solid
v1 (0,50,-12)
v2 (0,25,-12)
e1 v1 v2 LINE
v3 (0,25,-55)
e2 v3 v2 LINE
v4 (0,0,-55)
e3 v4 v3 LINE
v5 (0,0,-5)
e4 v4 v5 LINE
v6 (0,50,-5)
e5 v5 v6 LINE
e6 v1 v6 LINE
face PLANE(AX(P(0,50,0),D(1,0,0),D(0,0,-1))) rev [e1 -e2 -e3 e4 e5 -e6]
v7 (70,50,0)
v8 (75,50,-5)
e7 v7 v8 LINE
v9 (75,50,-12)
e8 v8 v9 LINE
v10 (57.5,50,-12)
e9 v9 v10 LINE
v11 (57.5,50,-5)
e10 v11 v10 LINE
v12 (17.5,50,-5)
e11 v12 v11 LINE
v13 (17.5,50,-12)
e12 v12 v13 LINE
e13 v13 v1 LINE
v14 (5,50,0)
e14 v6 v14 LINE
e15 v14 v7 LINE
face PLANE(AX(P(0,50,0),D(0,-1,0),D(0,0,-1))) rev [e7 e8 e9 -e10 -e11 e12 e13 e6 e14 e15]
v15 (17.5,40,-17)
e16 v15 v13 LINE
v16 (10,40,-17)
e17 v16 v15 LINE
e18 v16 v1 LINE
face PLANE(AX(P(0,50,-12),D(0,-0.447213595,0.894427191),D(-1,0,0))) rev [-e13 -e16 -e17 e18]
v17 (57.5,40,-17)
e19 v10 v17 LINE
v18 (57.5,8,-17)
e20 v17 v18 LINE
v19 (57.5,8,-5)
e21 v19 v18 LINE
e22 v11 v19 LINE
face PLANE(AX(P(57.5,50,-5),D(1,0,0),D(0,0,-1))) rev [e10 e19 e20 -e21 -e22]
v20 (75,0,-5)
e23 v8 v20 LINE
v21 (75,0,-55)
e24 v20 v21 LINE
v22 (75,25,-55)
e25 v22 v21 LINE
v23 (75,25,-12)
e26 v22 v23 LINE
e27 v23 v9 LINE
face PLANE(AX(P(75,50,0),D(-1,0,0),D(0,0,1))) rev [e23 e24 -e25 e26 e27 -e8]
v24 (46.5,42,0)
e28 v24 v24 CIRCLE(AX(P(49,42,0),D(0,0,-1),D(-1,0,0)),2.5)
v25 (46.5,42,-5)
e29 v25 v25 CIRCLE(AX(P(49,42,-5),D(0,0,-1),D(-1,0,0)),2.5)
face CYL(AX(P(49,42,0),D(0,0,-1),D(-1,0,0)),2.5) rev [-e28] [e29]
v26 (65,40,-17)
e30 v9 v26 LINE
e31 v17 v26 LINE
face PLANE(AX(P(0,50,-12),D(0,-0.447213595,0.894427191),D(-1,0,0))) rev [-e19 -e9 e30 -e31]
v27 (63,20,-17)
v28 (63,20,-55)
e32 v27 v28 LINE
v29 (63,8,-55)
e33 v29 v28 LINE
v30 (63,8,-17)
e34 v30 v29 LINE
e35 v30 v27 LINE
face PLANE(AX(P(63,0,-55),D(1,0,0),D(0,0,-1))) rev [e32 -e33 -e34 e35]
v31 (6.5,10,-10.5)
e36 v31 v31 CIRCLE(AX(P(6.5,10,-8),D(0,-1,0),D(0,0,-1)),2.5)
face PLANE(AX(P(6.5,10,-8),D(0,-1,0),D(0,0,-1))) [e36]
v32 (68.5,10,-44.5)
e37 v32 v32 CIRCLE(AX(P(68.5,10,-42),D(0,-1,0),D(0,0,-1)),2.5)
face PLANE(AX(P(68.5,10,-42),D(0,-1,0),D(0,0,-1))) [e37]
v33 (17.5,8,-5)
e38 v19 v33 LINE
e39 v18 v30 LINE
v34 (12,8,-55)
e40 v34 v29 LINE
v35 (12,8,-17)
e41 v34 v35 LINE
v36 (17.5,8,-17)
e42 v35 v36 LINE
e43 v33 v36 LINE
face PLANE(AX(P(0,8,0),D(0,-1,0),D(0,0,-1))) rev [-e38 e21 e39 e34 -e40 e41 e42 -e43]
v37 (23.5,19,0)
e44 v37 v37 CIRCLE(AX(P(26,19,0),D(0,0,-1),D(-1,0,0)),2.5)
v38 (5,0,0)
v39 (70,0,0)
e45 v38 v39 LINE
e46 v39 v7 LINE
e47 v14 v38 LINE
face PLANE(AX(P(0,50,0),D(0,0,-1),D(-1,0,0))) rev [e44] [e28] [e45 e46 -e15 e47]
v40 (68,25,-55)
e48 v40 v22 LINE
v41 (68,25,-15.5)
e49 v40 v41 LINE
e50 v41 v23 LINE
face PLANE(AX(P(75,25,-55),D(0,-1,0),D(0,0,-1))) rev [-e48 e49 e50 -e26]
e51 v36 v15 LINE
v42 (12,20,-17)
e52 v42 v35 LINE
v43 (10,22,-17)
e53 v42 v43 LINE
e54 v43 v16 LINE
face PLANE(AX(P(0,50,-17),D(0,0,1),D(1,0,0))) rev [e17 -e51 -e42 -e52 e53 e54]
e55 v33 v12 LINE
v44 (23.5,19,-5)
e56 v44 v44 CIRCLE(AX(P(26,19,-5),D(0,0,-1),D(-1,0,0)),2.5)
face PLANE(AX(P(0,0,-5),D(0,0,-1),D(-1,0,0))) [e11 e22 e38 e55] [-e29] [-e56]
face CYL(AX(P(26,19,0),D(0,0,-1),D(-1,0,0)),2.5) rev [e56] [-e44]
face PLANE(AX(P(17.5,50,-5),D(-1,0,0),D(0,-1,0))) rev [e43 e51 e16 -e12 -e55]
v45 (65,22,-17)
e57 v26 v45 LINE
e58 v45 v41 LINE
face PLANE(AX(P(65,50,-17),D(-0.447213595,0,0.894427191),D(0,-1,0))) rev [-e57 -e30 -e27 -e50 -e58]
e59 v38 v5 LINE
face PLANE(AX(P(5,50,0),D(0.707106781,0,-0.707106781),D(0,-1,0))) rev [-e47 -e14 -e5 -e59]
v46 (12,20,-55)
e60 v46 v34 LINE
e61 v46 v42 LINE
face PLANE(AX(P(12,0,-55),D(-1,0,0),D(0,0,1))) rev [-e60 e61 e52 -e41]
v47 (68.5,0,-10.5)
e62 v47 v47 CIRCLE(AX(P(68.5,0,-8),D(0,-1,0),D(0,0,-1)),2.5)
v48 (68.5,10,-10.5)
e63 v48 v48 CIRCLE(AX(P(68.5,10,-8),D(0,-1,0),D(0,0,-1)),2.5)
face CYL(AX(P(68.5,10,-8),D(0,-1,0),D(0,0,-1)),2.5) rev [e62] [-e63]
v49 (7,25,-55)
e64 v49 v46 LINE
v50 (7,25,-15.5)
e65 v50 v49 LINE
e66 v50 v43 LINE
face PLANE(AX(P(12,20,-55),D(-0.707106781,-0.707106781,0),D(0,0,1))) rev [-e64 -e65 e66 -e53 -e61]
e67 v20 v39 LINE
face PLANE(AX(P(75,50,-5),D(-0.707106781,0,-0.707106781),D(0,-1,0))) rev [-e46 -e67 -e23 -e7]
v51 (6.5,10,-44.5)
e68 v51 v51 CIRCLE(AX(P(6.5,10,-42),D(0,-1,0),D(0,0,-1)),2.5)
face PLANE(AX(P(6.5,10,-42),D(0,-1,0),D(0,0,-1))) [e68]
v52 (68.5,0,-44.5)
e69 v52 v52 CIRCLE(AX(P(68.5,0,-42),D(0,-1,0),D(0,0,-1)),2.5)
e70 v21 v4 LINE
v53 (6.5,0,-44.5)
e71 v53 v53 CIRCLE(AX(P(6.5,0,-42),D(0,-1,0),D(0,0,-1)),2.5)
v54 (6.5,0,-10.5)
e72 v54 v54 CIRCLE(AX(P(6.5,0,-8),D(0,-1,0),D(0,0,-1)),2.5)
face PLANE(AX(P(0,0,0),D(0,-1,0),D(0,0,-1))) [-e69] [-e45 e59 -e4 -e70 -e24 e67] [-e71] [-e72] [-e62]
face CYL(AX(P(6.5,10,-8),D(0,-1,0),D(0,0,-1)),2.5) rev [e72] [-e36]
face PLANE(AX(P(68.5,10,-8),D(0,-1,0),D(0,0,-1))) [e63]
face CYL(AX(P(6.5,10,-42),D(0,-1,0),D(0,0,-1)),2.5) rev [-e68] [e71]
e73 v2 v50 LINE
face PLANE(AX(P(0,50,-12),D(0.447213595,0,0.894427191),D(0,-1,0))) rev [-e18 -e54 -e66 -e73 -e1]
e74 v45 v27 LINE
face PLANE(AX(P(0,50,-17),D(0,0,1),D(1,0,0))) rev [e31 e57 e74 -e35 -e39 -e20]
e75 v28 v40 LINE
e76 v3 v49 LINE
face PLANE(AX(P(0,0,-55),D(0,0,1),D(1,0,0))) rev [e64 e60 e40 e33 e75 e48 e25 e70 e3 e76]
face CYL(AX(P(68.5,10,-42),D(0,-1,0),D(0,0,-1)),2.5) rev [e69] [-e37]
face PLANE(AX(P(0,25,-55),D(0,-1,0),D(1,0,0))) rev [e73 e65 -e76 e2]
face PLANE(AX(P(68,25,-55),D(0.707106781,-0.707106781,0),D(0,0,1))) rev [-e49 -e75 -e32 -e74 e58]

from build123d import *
from OCP.BRepFilletAPI import BRepFilletAPI_MakeChamfer

# Parameters (mm, degrees)
SKETCH1_W           = 75
SKETCH1_H           = 17
BOSS_EXTRUDE1_DEPTH = 50
SKETCH2_W           = 12
SKETCH2_H           = 25
BOSS_EXTRUDE2_DEPTH = 38
SKETCH3_W           = 75
SKETCH3_H           = 55
BOSS_EXTRUDE3_DEPTH = 8
SKETCH4_R           = 2.5
CUT_EXTRUDE1_DEPTH  = 10
SKETCH5_W           = 40
SKETCH5_H           = 42
CUT_EXTRUDE2_DEPTH  = 12
CUT_EXTRUDE3_DEPTH  = 104.07764064
CHAMFER1_SIZE       = 5
CHAMFER3_SIZE       = 5
CHAMFER3_SIZE_2     = 10
CHAMFER4_SIZE       = 5
CHAMFER4_SIZE2      = 10


with BuildPart() as part:
    # Sketch1 → Boss-Extrude1 (new body)
    with BuildSketch(Plane(origin=(0, 0, 0), x_dir=(1, 0, 0), z_dir=(0, 1, 0))):
        with Locations((37.5, 8.5)):
            Rectangle(SKETCH1_W, SKETCH1_H)
    extrude(amount=BOSS_EXTRUDE1_DEPTH)

    # Sketch2 → Boss-Extrude2 (add)
    with BuildSketch(Plane(origin=(0, 0, -17), x_dir=(-1, 0, 0), z_dir=(0, 0, -1))):
        with Locations((-69, 12.5)):
            Rectangle(SKETCH2_W, SKETCH2_H)
        with Locations((-6, 12.5)):
            Rectangle(SKETCH2_W, SKETCH2_H)
    extrude(amount=BOSS_EXTRUDE2_DEPTH)

    # Sketch3 → Boss-Extrude3 (add)
    with BuildSketch(Plane.XZ):
        with Locations((37.5, -27.5)):
            Rectangle(SKETCH3_W, SKETCH3_H)
    extrude(amount=-BOSS_EXTRUDE3_DEPTH)

    # Sketch4 → Cut-Extrude1 (cut)
    with BuildSketch(Plane(origin=(0, 0, 0), x_dir=(-1, 0, 0), z_dir=(0, -1, 0))):
        with Locations(Location((-6.5, 8, 0), (0, 0, 90))):
            Circle(SKETCH4_R)
        with Locations(Location((-68.5, 8, 0), (0, 0, 90))):
            Circle(SKETCH4_R)
        with Locations(Location((-6.5, 42, 0), (0, 0, 90))):
            Circle(SKETCH4_R)
        with Locations(Location((-68.5, 42, 0), (0, 0, 90))):
            Circle(SKETCH4_R)
    extrude(amount=-CUT_EXTRUDE1_DEPTH, mode=Mode.SUBTRACT)

    # Sketch5 → Cut-Extrude2 (cut)
    with BuildSketch(Plane(origin=(0, 0, -17), x_dir=(-1, 0, 0), z_dir=(0, 0, -1))):
        with Locations((-37.5, 29)):
            Rectangle(SKETCH5_W, SKETCH5_H)
    extrude(amount=-CUT_EXTRUDE2_DEPTH, mode=Mode.SUBTRACT)

    # Sketch6 → Cut-Extrude3 (cut, through all)
    with BuildSketch(Plane(origin=(0, 0, -5), x_dir=(-1, 0, 0), z_dir=(0, 0, -1))):
        with BuildLine():
            Line((-49, 39.5), (-49, 42))
            Line((-49, 42), (-46.5, 42))
            ThreePointArc((-46.5, 42), (-50.767766953, 43.767766953), (-49, 39.5))
        make_face()
        with BuildLine():
            Line((-46.5, 42), (-49, 42))
            Line((-49, 42), (-49, 39.5))
            ThreePointArc((-49, 39.5), (-47.232233047, 40.232233047), (-46.5, 42))
        make_face()
        with BuildLine():
            ThreePointArc((-23.5, 19), (-24.232233047, 20.767766953), (-26, 21.5))
            Line((-26, 21.5), (-26, 19))
            Line((-26, 19), (-28.5, 19))
            ThreePointArc((-28.5, 19), (-26, 16.5), (-23.5, 19))
        make_face()
        with BuildLine():
            Line((-26, 19), (-26, 21.5))
            ThreePointArc((-26, 21.5), (-27.767766953, 20.767766953), (-28.5, 19))
            Line((-28.5, 19), (-26, 19))
        make_face()
    extrude(amount=-CUT_EXTRUDE3_DEPTH, mode=Mode.SUBTRACT)

    # Chamfer1
    chamfer1_edges = [part.edges().sort_by_distance(p)[0] for p in [
        (63, 25, -36),
        (12, 25, -36),
        (75, 25, 0),
        (0, 25, 0),
    ]]
    chamfer(chamfer1_edges, length=CHAMFER1_SIZE)

    # Chamfer3
    chamfer3_edges_1 = [part.edges().sort_by_distance(p)[0] for p in [
        (0, 37.5, -17),
    ]]
    chamfer3_side_1 = [part.faces().sort_by_distance(p)[0] for p in [
        (0, 37.5, -16.9),
    ]]
    chamfer3_edges_2 = [part.edges().sort_by_distance(p)[0] for p in [
        (8.75, 50, -17),
    ]]
    chamfer3_side_2 = [part.faces().sort_by_distance(p)[0] for p in [
        (8.75, 50, -16.9),
    ]]
    chamfer3 = BRepFilletAPI_MakeChamfer(part.part.solid().wrapped)
    for e in chamfer3_edges_1:
        chamfer3.Add(CHAMFER3_SIZE - 0.0001, CHAMFER3_SIZE_2 - 0.0001, e.wrapped, chamfer3_side_1[0].wrapped)
    for e in chamfer3_edges_2:
        chamfer3.Add(CHAMFER3_SIZE - 0.0001, CHAMFER3_SIZE_2 - 0.0001, e.wrapped, chamfer3_side_2[0].wrapped)
    add(Compound.cast(chamfer3.Shape()), mode=Mode.REPLACE)  # a hair under: the kernel refuses the full size

    # Chamfer4: one chamfer whose edges measure the first distance from different faces: ONE call of the kernel's chamfer builder (chamfer() names one face for all edges)
    chamfer4_edges_1 = [part.edges().sort_by_distance(p)[0] for p in [
        (66.25, 50, -17),
    ]]
    chamfer4_side_1 = [part.faces().sort_by_distance(p)[0] for p in [
        (0.769025357, 50, -8.50005),
    ]]
    chamfer4_edges_2 = [part.edges().sort_by_distance(p)[0] for p in [
        (75, 37.5, -17),
    ]]
    chamfer4_side_2 = [part.faces().sort_by_distance(p)[0] for p in [
        (75, 17.338709677, -26.322580645),
    ]]
    chamfer4 = BRepFilletAPI_MakeChamfer(part.part.solid().wrapped)
    for e in chamfer4_edges_1:
        chamfer4.Add(CHAMFER4_SIZE, CHAMFER4_SIZE2, e.wrapped, chamfer4_side_1[0].wrapped)  # the first distance lies on this face
    for e in chamfer4_edges_2:
        chamfer4.Add(CHAMFER4_SIZE, CHAMFER4_SIZE2, e.wrapped, chamfer4_side_2[0].wrapped)  # the first distance lies on this face
    add(Compound.cast(chamfer4.Shape()), mode=Mode.REPLACE)


solid = part.part
